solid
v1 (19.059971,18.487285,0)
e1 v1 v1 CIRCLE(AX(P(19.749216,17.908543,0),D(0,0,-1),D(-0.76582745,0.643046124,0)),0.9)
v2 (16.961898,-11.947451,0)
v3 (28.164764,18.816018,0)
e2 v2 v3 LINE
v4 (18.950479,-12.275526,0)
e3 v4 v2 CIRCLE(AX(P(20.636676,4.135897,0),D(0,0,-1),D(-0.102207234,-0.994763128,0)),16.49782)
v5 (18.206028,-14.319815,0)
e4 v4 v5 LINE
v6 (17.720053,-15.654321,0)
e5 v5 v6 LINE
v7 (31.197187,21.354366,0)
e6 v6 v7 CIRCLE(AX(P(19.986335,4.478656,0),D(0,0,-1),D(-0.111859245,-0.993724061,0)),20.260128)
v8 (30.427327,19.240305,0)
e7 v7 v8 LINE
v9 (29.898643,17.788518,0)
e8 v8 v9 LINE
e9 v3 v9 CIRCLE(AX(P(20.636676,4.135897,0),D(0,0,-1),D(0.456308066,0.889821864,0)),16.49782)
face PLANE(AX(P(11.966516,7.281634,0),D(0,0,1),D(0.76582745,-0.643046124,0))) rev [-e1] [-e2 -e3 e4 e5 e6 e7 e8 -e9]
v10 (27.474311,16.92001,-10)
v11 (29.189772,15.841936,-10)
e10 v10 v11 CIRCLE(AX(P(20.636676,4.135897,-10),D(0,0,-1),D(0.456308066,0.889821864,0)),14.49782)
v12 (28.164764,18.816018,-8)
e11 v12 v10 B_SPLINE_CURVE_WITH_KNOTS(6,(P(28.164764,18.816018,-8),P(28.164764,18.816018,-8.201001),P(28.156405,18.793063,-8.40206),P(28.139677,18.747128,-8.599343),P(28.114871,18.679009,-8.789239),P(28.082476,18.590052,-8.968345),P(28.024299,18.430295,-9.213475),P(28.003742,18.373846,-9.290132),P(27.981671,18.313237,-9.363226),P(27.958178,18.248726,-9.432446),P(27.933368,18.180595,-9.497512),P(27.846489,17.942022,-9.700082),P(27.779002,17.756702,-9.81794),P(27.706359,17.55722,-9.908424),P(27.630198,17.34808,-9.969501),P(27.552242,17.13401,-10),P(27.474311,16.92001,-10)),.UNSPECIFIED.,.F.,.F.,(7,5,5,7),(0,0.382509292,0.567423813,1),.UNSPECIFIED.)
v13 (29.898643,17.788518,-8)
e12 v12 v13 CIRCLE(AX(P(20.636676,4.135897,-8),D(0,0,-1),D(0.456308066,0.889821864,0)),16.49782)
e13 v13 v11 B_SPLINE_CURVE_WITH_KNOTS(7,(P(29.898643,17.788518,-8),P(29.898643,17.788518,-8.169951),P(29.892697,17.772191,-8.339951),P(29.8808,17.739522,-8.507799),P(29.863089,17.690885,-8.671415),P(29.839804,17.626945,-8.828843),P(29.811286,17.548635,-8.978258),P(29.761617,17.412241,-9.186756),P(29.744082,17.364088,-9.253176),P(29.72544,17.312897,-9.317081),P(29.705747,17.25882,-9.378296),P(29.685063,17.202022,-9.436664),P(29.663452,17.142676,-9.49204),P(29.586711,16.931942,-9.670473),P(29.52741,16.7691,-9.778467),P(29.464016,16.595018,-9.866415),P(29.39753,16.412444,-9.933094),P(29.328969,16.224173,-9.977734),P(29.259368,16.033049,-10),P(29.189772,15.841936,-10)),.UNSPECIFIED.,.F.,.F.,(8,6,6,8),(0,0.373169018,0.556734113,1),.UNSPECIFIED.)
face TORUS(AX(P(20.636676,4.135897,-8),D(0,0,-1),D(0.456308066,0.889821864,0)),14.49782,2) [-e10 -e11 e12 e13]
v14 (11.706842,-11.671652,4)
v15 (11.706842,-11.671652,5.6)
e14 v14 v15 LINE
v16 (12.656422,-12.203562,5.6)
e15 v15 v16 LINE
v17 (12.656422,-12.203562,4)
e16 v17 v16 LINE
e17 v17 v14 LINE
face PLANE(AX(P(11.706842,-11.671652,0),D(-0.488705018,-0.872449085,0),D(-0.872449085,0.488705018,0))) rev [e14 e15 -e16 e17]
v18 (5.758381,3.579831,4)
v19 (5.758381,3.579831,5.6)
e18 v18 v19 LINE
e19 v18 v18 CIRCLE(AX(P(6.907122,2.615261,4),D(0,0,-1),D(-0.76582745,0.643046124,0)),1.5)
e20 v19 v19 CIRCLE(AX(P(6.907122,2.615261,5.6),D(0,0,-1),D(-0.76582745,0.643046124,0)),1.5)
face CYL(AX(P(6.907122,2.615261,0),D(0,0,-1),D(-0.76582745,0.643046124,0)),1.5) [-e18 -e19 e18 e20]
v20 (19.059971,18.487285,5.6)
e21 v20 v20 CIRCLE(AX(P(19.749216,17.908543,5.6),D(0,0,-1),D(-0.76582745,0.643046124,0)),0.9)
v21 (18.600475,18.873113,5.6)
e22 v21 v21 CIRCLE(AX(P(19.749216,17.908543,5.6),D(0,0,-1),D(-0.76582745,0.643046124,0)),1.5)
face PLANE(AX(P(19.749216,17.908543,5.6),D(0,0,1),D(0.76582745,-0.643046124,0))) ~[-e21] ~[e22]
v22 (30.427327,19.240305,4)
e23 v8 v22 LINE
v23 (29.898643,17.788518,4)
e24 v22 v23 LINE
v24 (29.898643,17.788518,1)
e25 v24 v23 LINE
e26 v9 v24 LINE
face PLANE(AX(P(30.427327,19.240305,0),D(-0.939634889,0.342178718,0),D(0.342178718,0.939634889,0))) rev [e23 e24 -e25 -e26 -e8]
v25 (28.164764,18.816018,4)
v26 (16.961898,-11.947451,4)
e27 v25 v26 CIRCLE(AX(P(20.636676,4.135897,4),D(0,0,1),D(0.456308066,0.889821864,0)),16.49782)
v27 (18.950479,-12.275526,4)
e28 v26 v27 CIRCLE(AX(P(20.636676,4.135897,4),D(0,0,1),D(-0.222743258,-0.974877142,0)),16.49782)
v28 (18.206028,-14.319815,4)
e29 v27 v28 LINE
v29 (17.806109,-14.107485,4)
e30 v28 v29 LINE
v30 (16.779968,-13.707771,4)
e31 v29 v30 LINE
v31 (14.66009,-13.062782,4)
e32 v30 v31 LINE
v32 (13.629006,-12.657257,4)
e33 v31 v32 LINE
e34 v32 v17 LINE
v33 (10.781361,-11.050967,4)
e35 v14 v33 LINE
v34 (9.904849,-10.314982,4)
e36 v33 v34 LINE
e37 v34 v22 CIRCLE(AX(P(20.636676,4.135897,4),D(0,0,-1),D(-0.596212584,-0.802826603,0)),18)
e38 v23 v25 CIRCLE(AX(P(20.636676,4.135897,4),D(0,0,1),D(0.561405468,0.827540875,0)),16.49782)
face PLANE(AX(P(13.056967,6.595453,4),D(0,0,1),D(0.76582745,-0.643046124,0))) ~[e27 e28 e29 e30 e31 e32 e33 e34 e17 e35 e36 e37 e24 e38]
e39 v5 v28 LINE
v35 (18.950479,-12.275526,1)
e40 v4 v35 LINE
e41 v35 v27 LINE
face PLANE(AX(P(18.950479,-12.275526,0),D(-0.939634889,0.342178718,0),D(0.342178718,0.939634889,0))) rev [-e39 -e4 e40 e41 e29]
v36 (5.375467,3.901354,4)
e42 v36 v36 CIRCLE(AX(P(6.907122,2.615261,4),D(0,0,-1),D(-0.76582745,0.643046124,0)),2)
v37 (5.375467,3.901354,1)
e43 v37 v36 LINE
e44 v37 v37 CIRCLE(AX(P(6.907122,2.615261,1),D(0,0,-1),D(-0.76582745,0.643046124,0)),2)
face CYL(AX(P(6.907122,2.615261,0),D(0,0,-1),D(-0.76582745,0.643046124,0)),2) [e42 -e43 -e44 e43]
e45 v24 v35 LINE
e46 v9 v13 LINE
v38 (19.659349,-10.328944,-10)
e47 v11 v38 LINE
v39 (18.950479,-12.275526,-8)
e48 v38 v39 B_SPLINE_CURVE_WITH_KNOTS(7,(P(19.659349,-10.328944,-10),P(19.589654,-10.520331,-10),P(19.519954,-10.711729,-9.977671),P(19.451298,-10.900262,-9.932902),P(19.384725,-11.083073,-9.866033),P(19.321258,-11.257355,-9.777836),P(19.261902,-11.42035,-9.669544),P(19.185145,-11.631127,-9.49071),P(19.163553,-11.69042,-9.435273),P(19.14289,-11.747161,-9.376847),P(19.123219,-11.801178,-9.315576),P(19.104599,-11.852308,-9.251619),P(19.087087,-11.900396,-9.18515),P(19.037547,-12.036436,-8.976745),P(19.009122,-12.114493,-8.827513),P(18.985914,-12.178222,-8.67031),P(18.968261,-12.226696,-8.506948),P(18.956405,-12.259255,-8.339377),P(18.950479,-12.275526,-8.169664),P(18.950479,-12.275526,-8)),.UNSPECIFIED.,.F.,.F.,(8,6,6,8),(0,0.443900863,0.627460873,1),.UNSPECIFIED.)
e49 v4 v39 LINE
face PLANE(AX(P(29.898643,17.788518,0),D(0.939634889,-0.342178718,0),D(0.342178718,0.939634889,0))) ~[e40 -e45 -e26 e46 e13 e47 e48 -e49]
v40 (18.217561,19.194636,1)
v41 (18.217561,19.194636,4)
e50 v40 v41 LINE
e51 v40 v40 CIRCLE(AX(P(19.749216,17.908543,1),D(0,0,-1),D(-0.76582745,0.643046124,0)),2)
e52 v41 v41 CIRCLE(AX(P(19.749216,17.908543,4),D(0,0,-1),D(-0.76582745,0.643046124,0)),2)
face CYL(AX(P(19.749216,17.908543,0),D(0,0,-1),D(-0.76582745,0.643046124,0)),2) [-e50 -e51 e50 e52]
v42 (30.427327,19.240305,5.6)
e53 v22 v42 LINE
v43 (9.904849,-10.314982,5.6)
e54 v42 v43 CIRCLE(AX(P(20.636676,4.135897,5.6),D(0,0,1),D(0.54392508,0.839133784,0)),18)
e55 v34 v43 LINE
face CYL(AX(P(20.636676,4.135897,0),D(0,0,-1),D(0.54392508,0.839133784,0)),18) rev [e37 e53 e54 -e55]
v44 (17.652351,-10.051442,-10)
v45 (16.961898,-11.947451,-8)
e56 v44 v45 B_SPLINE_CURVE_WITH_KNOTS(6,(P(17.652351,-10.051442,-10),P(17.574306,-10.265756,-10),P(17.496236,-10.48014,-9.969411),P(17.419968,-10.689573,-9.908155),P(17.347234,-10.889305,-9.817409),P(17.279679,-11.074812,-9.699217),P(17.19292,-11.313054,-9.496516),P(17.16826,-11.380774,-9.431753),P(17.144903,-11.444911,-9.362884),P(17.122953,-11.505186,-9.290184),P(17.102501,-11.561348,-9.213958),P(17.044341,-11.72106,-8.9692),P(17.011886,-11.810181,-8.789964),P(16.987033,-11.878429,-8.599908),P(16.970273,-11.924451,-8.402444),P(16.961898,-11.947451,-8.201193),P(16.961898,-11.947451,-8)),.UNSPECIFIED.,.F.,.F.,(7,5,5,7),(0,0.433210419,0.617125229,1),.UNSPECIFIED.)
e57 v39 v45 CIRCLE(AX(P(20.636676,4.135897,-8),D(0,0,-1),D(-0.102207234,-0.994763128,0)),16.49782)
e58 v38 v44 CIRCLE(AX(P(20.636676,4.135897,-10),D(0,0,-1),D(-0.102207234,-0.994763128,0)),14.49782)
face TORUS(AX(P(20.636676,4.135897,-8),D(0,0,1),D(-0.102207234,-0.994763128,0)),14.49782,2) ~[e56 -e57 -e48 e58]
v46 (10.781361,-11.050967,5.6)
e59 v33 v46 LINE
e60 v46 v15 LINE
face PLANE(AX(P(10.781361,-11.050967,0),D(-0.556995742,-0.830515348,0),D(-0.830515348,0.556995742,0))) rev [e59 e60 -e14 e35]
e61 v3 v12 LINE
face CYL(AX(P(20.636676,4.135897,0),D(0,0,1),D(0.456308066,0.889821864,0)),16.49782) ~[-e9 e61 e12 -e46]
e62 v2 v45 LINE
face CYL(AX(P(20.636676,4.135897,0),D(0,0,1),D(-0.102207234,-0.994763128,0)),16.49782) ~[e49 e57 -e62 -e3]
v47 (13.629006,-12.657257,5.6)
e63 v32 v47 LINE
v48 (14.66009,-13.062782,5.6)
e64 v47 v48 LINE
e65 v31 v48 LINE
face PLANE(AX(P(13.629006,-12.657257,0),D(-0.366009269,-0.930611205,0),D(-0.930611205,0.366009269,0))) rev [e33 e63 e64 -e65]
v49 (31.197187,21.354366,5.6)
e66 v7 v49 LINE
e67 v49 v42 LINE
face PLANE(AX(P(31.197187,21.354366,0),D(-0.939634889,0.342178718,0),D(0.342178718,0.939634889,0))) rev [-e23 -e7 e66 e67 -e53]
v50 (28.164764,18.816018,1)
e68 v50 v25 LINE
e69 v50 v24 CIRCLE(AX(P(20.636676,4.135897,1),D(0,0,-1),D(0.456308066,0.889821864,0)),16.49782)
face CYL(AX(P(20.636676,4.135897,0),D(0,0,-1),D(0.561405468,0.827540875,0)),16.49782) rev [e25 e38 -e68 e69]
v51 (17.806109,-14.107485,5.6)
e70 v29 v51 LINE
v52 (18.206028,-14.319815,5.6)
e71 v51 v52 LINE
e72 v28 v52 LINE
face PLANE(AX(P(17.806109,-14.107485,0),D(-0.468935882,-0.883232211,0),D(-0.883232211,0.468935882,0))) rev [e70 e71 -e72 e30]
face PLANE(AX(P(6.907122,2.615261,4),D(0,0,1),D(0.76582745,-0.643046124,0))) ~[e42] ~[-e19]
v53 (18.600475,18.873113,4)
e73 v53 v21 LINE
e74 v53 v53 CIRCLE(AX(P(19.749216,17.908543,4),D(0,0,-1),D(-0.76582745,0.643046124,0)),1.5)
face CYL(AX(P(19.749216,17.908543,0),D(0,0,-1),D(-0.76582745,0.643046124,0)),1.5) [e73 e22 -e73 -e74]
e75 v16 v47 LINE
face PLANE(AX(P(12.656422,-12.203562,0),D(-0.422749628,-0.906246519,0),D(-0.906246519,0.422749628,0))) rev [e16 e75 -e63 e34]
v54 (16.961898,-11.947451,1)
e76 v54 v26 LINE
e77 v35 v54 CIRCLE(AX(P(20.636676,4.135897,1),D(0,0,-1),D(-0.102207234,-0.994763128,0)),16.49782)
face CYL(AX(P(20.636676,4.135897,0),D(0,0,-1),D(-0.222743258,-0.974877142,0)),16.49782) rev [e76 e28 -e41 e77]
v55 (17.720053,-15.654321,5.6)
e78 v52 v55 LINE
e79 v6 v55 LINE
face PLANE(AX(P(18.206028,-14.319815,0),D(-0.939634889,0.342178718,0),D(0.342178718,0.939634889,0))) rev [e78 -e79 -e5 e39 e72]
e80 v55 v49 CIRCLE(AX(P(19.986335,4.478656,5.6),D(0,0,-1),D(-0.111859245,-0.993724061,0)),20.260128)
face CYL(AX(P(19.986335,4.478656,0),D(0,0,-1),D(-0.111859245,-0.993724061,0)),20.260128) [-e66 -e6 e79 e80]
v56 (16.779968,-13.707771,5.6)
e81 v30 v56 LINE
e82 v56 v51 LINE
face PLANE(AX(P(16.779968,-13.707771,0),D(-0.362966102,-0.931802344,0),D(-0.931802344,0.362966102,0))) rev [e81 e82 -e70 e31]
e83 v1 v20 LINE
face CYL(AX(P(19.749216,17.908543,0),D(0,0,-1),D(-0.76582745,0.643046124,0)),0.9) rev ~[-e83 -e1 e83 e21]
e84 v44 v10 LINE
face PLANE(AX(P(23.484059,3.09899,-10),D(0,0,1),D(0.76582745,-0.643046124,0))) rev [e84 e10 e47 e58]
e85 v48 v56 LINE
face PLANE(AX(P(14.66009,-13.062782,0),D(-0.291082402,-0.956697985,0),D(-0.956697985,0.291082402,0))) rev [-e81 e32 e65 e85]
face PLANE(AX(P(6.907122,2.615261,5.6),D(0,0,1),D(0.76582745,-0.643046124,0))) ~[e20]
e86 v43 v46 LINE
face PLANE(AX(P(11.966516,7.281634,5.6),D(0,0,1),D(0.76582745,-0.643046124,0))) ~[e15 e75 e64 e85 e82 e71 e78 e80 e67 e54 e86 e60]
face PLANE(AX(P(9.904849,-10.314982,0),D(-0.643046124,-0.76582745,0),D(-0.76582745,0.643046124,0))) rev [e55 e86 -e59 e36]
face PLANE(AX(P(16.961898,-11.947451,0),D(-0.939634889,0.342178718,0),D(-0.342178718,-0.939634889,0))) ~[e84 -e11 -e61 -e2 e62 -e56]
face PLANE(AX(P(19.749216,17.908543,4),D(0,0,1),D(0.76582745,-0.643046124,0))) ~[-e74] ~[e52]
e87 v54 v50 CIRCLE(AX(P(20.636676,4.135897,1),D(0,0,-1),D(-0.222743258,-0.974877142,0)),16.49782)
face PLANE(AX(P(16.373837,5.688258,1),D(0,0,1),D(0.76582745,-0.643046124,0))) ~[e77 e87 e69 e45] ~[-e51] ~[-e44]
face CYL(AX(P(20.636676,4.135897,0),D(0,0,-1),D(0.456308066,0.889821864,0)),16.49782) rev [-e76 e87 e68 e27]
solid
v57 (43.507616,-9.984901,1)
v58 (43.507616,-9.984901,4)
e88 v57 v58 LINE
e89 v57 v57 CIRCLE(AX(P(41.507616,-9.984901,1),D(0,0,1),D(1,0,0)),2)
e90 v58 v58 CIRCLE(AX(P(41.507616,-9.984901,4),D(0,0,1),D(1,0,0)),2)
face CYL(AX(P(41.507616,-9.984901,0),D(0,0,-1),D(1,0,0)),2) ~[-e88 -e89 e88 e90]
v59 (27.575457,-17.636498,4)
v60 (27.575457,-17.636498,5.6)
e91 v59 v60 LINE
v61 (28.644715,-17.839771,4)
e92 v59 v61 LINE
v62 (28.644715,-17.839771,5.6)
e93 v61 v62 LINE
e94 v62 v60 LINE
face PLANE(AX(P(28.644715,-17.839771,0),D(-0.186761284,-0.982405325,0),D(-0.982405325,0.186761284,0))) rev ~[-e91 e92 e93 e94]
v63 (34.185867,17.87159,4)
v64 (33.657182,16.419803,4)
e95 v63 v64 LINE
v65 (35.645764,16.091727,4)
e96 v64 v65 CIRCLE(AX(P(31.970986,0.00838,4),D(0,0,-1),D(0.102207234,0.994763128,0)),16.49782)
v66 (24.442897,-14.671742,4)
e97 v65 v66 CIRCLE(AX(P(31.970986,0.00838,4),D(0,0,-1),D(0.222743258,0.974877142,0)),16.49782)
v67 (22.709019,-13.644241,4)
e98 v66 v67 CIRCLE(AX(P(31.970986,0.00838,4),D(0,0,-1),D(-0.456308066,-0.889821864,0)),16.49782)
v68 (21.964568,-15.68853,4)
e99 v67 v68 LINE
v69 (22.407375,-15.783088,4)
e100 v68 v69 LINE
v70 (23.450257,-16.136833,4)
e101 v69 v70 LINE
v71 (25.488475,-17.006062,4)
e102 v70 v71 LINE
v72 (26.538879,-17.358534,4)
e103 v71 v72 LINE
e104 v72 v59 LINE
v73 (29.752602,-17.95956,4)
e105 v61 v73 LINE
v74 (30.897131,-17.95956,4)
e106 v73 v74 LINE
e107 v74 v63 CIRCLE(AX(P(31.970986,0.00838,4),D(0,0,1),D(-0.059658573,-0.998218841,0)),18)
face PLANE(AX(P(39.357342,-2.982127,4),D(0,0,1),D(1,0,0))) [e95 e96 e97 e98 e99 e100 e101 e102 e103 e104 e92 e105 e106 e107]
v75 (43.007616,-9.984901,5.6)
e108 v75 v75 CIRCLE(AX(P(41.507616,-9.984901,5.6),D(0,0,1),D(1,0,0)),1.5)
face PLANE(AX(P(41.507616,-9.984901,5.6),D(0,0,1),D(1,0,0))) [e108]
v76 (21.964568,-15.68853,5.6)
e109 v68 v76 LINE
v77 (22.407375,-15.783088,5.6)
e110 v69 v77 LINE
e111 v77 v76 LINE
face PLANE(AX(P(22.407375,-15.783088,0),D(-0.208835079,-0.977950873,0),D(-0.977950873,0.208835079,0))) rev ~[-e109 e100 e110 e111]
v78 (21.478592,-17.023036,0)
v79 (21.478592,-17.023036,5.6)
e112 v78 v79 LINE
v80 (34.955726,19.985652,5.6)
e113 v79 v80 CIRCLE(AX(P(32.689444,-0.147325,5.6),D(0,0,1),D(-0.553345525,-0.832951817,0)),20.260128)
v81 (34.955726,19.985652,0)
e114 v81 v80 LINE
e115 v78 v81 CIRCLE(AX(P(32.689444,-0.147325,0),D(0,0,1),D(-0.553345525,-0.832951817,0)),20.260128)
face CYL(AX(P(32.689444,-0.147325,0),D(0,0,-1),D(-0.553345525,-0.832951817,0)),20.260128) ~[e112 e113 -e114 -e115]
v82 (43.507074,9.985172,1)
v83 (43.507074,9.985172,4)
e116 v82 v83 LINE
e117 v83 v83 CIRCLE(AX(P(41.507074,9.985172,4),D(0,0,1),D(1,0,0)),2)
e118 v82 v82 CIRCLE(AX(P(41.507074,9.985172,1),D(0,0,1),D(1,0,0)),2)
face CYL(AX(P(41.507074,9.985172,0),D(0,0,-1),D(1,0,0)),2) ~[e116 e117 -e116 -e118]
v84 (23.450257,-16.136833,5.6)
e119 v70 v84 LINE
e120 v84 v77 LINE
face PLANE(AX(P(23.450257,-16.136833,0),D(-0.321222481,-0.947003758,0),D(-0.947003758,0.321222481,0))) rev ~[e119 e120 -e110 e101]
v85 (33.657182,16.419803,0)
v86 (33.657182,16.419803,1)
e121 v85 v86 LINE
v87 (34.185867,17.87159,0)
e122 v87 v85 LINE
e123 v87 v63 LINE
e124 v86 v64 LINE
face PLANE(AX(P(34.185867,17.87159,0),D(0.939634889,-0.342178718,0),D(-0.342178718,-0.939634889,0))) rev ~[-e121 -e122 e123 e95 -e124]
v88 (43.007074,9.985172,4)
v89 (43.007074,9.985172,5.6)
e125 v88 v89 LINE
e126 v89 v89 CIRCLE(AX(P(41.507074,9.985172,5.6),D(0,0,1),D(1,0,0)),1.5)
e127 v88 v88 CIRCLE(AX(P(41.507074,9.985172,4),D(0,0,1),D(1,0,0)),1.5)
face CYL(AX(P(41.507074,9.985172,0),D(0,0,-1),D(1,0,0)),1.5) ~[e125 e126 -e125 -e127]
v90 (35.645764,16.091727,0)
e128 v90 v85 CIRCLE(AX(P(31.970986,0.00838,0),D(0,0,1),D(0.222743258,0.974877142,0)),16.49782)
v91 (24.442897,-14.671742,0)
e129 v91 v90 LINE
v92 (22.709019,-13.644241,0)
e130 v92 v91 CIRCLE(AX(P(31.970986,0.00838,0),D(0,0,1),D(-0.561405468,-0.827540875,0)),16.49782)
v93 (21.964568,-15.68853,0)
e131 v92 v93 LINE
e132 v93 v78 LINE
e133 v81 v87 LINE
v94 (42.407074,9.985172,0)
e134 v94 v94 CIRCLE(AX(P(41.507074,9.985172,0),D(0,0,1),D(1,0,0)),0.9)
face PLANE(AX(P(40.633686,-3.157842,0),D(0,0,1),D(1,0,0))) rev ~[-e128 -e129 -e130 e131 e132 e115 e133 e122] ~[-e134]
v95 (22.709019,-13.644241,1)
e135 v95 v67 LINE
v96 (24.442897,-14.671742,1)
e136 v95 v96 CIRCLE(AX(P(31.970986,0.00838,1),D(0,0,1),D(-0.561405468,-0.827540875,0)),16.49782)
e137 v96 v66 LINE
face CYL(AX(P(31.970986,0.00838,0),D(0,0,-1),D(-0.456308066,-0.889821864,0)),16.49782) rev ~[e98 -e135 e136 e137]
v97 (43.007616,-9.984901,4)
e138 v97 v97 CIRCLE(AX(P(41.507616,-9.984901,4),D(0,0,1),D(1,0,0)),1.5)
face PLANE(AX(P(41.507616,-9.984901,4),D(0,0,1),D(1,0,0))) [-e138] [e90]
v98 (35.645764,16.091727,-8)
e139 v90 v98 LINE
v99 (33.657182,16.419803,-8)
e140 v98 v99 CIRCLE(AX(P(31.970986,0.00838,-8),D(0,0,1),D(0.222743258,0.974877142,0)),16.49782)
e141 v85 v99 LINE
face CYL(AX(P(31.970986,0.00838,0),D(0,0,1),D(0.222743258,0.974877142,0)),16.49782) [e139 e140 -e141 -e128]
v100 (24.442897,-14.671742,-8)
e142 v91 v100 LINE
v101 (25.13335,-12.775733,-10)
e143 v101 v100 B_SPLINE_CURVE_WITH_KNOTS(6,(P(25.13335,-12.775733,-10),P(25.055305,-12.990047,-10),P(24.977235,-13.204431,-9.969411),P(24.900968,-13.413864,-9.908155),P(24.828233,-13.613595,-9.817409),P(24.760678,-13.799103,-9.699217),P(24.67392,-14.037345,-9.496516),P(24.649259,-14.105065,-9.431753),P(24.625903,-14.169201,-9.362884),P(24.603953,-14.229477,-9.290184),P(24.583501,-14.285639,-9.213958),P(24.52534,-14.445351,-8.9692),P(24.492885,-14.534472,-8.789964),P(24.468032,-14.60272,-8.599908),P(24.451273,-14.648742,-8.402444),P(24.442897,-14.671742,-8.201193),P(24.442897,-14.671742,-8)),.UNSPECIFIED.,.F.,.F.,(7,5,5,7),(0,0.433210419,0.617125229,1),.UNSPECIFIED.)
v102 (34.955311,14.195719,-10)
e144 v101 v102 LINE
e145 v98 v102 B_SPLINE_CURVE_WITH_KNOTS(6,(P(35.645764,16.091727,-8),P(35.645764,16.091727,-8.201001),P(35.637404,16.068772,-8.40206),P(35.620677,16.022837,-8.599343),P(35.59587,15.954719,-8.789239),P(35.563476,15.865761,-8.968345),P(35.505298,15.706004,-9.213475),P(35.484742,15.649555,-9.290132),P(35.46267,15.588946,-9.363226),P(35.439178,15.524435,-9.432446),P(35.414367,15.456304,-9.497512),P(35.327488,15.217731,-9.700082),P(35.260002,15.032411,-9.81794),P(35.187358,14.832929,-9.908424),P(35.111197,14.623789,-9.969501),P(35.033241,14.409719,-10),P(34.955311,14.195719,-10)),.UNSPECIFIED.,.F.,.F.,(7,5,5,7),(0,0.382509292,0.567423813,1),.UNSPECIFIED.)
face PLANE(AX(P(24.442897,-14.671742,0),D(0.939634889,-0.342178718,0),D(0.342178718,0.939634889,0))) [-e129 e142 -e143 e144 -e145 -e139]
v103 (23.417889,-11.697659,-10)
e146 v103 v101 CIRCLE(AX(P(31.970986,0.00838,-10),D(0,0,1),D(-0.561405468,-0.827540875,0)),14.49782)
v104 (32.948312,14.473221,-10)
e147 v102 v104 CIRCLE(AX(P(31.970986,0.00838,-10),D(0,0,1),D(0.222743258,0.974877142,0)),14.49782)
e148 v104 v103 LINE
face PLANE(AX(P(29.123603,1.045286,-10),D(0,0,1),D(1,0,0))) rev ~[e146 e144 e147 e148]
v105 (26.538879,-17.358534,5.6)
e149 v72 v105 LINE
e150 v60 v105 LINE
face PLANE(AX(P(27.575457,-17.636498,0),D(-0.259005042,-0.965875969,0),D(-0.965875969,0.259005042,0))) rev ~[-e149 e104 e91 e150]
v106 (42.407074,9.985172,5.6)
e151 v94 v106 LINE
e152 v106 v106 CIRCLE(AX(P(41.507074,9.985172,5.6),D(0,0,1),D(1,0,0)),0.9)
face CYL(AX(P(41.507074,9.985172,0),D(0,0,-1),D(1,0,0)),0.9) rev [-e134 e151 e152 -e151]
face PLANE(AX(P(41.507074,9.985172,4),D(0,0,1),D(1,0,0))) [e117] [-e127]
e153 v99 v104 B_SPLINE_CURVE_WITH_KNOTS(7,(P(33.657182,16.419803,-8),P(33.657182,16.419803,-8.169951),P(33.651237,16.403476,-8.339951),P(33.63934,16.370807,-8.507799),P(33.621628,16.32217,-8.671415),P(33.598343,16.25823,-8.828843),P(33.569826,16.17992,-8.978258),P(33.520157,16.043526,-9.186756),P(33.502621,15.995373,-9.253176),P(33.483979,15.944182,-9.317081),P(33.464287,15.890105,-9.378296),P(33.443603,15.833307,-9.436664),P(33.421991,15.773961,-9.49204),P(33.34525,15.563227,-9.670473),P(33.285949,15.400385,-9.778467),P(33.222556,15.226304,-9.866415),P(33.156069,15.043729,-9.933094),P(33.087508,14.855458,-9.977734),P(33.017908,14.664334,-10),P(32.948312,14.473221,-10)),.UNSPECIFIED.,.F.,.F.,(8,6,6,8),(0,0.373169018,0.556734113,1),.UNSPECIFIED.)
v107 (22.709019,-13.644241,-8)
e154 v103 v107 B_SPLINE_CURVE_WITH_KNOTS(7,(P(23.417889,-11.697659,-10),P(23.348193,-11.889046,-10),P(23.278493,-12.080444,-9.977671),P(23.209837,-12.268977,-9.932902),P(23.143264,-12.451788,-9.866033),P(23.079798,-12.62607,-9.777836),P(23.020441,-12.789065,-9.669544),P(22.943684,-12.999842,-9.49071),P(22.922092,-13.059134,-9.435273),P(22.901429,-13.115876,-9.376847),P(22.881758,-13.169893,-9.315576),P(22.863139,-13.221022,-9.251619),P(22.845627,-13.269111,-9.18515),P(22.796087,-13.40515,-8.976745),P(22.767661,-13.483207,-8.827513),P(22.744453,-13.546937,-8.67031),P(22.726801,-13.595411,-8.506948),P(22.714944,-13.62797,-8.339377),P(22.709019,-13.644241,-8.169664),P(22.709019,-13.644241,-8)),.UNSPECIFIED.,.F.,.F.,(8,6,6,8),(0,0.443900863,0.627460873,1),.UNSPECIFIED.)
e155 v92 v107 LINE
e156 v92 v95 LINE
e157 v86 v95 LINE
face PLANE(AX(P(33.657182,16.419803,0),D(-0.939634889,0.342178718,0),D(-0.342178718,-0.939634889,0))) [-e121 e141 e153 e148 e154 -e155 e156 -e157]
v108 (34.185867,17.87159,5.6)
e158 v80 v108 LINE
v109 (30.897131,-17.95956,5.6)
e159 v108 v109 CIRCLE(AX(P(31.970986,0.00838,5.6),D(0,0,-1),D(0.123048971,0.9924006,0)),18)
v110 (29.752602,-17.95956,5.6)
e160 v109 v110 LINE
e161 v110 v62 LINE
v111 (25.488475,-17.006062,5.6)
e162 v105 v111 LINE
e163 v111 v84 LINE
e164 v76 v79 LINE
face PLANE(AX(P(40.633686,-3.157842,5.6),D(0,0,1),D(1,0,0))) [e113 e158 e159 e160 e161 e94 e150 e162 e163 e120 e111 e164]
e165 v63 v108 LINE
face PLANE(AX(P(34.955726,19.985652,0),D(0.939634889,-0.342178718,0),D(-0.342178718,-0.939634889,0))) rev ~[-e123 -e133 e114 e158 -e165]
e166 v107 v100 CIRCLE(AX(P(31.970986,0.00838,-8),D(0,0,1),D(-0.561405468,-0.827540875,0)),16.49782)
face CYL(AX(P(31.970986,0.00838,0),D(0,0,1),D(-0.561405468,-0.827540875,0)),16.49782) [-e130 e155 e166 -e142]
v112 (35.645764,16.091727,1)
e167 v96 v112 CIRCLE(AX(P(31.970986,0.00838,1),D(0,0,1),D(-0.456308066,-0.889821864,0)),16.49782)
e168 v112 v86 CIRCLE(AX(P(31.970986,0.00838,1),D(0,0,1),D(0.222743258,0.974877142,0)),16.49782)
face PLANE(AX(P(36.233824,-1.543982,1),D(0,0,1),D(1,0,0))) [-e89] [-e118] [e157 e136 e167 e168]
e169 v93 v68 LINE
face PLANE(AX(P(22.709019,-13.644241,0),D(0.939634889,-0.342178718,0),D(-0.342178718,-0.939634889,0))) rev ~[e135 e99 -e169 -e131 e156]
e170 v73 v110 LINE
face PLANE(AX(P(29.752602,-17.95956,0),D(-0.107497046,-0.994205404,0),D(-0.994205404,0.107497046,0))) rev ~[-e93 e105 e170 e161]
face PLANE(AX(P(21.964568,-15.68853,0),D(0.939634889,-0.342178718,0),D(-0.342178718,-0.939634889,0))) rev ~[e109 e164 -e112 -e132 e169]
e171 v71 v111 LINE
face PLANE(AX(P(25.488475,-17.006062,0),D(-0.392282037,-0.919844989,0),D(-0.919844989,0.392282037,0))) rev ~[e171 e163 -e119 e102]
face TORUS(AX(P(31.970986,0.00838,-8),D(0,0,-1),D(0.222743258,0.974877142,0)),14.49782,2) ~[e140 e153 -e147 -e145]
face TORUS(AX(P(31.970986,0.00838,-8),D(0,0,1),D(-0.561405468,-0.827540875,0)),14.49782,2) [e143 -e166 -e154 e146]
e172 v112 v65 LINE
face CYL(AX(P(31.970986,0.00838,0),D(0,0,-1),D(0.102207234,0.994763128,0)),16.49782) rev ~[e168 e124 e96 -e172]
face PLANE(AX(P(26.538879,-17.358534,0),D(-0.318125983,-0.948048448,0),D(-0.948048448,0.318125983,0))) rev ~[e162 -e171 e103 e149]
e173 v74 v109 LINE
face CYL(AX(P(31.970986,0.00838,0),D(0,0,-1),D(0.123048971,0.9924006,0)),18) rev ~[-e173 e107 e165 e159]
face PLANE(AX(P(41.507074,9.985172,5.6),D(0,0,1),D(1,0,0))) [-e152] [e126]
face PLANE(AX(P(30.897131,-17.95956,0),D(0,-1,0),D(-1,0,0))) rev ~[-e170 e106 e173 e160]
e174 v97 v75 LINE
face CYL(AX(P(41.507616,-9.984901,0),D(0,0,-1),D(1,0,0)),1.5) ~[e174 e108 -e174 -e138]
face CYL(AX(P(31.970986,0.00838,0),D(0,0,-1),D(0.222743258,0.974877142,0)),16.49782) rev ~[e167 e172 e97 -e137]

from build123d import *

# Parameters (mm, degrees)
F3_R     = 2
F4_DEPTH = 1
F3_R_2   = 1.5
F5_DEPTH = 4
F3_R_3   = 0.9
F6_DEPTH = 5.6
F7_DEPTH = 10
F8_R     = 2


# Not quite as in the source:
# - a feature names something its author has since deleted; it is built from what else it names


with BuildPart() as f4:
    # F3 (on Top) → F4 (new body)
    with BuildSketch(Plane.XY):
        with BuildLine():
            ThreePointArc((24.4428970275, -14.671741632), (47.4729130652, -5.6368234206), (35.645763749, 16.0917274937))
            Line((35.645763749, 16.0917274937), (24.4428970275, -14.671741632))
        make_face()
        with Locations((41.5076157406, -9.9849013437)):
            Circle(F3_R, mode=Mode.SUBTRACT)
        with Locations((41.5070735985, 9.9851724147)):
            Circle(F3_R, mode=Mode.SUBTRACT)
        with BuildLine():
            ThreePointArc((35.645763749, 16.0917274937), (34.656487532, 16.286160575), (33.6571820844, 16.4198029295))
            Line((33.6571820844, 16.4198029295), (22.7090189654, -13.6442410753))
            ThreePointArc((22.7090189654, -13.6442410753), (23.5602527059, -14.1844935862), (24.4428970275, -14.671741632))
            Line((24.4428970275, -14.671741632), (35.645763749, 16.0917274937))
        make_face()
    extrude(amount=F4_DEPTH)

    # F3 (on Top) → F5 (join)
    with BuildSketch(Plane.XY):
        with BuildLine():
            Line((29.7526022679, -17.9595595539), (30.8971311949, -17.9595595539))
            ThreePointArc((30.8971311949, -17.9595595539), (49.8956420488, -1.6368218512), (34.185866977, 17.871590385))
            Line((34.185866977, 17.871590385), (33.6571820844, 16.4198029295))
            ThreePointArc((33.6571820844, 16.4198029295), (34.656487532, 16.286160575), (35.645763749, 16.0917274937))
            ThreePointArc((35.645763749, 16.0917274937), (47.4729130652, -5.6368234206), (24.4428970275, -14.671741632))
            ThreePointArc((24.4428970275, -14.671741632), (23.5602527059, -14.1844935862), (22.7090189654, -13.6442410753))
            Line((22.7090189654, -13.6442410753), (21.9645680543, -15.6885296658))
            Line((21.9645680543, -15.6885296658), (22.4073752761, -15.7830882818))
            Line((22.4073752761, -15.7830882818), (23.4502572566, -16.1368325353))
            Line((23.4502572566, -16.1368325353), (25.4884753376, -17.0060619712))
            Line((25.4884753376, -17.0060619712), (26.5388786793, -17.3585340381))
            Line((26.5388786793, -17.3585340381), (27.5754574686, -17.6364984363))
            Line((27.5754574686, -17.6364984363), (28.6447145045, -17.8397707641))
            Line((28.6447145045, -17.8397707641), (29.7526022679, -17.9595595539))
        make_face()
        with Locations((41.5076157406, -9.9849013437)):
            Circle(F3_R)
        with Locations((41.5076157406, -9.9849013437)):
            Circle(F3_R_2, mode=Mode.SUBTRACT)
        with Locations((41.5070735985, 9.9851724147)):
            Circle(F3_R)
        with Locations((41.5070735985, 9.9851724147)):
            Circle(F3_R_2, mode=Mode.SUBTRACT)
    extrude(amount=F5_DEPTH)

    # F3 (on Top) → F6 (join)
    with BuildSketch(Plane.XY):
        with BuildLine():
            ThreePointArc((34.185866977, 17.871590385), (49.8956420488, -1.6368218512), (30.8971311949, -17.9595595539))
            Line((30.8971311949, -17.9595595539), (29.7526022679, -17.9595595539))
            Line((29.7526022679, -17.9595595539), (28.6447145045, -17.8397707641))
            Line((28.6447145045, -17.8397707641), (27.5754574686, -17.6364984363))
            Line((27.5754574686, -17.6364984363), (26.5388786793, -17.3585340381))
            Line((26.5388786793, -17.3585340381), (25.4884753376, -17.0060619712))
            Line((25.4884753376, -17.0060619712), (23.4502572566, -16.1368325353))
            Line((23.4502572566, -16.1368325353), (22.4073752761, -15.7830882818))
            Line((22.4073752761, -15.7830882818), (21.9645680543, -15.6885296658))
            Line((21.9645680543, -15.6885296658), (21.4785924091, -17.0230360138))
            ThreePointArc((21.4785924091, -17.0230360138), (51.7265670481, -7.0799100929), (34.9557263509, 19.985651515))
            Line((34.9557263509, 19.985651515), (34.185866977, 17.871590385))
        make_face()
        with Locations((41.5076157406, -9.9849013437)):
            Circle(F3_R_2)
        with Locations((41.5070735985, 9.9851724147)):
            Circle(F3_R_2)
        with Locations((41.5070735985, 9.9851724147)):
            Circle(F3_R_3, mode=Mode.SUBTRACT)
    extrude(amount=F6_DEPTH)

    # F3 (on Top) → F7 (join)
    with BuildSketch(Plane.XY):
        with BuildLine():
            ThreePointArc((35.645763749, 16.0917274937), (34.656487532, 16.286160575), (33.6571820844, 16.4198029295))
            Line((33.6571820844, 16.4198029295), (22.7090189654, -13.6442410753))
            ThreePointArc((22.7090189654, -13.6442410753), (23.5602527059, -14.1844935862), (24.4428970275, -14.671741632))
            Line((24.4428970275, -14.671741632), (35.645763749, 16.0917274937))
        make_face()
    extrude(amount=-F7_DEPTH)

    # F8
    f8_edges = [f4.edges().sort_by_distance(p)[0] for p in [
        (23.560253, -14.184494, -10),
        (34.656488, 16.286161, -10),
    ]]
    fillet(f8_edges, radius=F8_R)


with BuildPart() as f10_1:
    # F10: instance of F4
    add(f4.part.mirror(Plane(origin=(26.3392995557, 2.1695369703, -3.8368049067), x_dir=(-0.3421787181, -0.9396348891, 0), z_dir=(-0.9396348891, 0.3421787181, 0))))


solid = Compound([f4.part, f10_1.part])
